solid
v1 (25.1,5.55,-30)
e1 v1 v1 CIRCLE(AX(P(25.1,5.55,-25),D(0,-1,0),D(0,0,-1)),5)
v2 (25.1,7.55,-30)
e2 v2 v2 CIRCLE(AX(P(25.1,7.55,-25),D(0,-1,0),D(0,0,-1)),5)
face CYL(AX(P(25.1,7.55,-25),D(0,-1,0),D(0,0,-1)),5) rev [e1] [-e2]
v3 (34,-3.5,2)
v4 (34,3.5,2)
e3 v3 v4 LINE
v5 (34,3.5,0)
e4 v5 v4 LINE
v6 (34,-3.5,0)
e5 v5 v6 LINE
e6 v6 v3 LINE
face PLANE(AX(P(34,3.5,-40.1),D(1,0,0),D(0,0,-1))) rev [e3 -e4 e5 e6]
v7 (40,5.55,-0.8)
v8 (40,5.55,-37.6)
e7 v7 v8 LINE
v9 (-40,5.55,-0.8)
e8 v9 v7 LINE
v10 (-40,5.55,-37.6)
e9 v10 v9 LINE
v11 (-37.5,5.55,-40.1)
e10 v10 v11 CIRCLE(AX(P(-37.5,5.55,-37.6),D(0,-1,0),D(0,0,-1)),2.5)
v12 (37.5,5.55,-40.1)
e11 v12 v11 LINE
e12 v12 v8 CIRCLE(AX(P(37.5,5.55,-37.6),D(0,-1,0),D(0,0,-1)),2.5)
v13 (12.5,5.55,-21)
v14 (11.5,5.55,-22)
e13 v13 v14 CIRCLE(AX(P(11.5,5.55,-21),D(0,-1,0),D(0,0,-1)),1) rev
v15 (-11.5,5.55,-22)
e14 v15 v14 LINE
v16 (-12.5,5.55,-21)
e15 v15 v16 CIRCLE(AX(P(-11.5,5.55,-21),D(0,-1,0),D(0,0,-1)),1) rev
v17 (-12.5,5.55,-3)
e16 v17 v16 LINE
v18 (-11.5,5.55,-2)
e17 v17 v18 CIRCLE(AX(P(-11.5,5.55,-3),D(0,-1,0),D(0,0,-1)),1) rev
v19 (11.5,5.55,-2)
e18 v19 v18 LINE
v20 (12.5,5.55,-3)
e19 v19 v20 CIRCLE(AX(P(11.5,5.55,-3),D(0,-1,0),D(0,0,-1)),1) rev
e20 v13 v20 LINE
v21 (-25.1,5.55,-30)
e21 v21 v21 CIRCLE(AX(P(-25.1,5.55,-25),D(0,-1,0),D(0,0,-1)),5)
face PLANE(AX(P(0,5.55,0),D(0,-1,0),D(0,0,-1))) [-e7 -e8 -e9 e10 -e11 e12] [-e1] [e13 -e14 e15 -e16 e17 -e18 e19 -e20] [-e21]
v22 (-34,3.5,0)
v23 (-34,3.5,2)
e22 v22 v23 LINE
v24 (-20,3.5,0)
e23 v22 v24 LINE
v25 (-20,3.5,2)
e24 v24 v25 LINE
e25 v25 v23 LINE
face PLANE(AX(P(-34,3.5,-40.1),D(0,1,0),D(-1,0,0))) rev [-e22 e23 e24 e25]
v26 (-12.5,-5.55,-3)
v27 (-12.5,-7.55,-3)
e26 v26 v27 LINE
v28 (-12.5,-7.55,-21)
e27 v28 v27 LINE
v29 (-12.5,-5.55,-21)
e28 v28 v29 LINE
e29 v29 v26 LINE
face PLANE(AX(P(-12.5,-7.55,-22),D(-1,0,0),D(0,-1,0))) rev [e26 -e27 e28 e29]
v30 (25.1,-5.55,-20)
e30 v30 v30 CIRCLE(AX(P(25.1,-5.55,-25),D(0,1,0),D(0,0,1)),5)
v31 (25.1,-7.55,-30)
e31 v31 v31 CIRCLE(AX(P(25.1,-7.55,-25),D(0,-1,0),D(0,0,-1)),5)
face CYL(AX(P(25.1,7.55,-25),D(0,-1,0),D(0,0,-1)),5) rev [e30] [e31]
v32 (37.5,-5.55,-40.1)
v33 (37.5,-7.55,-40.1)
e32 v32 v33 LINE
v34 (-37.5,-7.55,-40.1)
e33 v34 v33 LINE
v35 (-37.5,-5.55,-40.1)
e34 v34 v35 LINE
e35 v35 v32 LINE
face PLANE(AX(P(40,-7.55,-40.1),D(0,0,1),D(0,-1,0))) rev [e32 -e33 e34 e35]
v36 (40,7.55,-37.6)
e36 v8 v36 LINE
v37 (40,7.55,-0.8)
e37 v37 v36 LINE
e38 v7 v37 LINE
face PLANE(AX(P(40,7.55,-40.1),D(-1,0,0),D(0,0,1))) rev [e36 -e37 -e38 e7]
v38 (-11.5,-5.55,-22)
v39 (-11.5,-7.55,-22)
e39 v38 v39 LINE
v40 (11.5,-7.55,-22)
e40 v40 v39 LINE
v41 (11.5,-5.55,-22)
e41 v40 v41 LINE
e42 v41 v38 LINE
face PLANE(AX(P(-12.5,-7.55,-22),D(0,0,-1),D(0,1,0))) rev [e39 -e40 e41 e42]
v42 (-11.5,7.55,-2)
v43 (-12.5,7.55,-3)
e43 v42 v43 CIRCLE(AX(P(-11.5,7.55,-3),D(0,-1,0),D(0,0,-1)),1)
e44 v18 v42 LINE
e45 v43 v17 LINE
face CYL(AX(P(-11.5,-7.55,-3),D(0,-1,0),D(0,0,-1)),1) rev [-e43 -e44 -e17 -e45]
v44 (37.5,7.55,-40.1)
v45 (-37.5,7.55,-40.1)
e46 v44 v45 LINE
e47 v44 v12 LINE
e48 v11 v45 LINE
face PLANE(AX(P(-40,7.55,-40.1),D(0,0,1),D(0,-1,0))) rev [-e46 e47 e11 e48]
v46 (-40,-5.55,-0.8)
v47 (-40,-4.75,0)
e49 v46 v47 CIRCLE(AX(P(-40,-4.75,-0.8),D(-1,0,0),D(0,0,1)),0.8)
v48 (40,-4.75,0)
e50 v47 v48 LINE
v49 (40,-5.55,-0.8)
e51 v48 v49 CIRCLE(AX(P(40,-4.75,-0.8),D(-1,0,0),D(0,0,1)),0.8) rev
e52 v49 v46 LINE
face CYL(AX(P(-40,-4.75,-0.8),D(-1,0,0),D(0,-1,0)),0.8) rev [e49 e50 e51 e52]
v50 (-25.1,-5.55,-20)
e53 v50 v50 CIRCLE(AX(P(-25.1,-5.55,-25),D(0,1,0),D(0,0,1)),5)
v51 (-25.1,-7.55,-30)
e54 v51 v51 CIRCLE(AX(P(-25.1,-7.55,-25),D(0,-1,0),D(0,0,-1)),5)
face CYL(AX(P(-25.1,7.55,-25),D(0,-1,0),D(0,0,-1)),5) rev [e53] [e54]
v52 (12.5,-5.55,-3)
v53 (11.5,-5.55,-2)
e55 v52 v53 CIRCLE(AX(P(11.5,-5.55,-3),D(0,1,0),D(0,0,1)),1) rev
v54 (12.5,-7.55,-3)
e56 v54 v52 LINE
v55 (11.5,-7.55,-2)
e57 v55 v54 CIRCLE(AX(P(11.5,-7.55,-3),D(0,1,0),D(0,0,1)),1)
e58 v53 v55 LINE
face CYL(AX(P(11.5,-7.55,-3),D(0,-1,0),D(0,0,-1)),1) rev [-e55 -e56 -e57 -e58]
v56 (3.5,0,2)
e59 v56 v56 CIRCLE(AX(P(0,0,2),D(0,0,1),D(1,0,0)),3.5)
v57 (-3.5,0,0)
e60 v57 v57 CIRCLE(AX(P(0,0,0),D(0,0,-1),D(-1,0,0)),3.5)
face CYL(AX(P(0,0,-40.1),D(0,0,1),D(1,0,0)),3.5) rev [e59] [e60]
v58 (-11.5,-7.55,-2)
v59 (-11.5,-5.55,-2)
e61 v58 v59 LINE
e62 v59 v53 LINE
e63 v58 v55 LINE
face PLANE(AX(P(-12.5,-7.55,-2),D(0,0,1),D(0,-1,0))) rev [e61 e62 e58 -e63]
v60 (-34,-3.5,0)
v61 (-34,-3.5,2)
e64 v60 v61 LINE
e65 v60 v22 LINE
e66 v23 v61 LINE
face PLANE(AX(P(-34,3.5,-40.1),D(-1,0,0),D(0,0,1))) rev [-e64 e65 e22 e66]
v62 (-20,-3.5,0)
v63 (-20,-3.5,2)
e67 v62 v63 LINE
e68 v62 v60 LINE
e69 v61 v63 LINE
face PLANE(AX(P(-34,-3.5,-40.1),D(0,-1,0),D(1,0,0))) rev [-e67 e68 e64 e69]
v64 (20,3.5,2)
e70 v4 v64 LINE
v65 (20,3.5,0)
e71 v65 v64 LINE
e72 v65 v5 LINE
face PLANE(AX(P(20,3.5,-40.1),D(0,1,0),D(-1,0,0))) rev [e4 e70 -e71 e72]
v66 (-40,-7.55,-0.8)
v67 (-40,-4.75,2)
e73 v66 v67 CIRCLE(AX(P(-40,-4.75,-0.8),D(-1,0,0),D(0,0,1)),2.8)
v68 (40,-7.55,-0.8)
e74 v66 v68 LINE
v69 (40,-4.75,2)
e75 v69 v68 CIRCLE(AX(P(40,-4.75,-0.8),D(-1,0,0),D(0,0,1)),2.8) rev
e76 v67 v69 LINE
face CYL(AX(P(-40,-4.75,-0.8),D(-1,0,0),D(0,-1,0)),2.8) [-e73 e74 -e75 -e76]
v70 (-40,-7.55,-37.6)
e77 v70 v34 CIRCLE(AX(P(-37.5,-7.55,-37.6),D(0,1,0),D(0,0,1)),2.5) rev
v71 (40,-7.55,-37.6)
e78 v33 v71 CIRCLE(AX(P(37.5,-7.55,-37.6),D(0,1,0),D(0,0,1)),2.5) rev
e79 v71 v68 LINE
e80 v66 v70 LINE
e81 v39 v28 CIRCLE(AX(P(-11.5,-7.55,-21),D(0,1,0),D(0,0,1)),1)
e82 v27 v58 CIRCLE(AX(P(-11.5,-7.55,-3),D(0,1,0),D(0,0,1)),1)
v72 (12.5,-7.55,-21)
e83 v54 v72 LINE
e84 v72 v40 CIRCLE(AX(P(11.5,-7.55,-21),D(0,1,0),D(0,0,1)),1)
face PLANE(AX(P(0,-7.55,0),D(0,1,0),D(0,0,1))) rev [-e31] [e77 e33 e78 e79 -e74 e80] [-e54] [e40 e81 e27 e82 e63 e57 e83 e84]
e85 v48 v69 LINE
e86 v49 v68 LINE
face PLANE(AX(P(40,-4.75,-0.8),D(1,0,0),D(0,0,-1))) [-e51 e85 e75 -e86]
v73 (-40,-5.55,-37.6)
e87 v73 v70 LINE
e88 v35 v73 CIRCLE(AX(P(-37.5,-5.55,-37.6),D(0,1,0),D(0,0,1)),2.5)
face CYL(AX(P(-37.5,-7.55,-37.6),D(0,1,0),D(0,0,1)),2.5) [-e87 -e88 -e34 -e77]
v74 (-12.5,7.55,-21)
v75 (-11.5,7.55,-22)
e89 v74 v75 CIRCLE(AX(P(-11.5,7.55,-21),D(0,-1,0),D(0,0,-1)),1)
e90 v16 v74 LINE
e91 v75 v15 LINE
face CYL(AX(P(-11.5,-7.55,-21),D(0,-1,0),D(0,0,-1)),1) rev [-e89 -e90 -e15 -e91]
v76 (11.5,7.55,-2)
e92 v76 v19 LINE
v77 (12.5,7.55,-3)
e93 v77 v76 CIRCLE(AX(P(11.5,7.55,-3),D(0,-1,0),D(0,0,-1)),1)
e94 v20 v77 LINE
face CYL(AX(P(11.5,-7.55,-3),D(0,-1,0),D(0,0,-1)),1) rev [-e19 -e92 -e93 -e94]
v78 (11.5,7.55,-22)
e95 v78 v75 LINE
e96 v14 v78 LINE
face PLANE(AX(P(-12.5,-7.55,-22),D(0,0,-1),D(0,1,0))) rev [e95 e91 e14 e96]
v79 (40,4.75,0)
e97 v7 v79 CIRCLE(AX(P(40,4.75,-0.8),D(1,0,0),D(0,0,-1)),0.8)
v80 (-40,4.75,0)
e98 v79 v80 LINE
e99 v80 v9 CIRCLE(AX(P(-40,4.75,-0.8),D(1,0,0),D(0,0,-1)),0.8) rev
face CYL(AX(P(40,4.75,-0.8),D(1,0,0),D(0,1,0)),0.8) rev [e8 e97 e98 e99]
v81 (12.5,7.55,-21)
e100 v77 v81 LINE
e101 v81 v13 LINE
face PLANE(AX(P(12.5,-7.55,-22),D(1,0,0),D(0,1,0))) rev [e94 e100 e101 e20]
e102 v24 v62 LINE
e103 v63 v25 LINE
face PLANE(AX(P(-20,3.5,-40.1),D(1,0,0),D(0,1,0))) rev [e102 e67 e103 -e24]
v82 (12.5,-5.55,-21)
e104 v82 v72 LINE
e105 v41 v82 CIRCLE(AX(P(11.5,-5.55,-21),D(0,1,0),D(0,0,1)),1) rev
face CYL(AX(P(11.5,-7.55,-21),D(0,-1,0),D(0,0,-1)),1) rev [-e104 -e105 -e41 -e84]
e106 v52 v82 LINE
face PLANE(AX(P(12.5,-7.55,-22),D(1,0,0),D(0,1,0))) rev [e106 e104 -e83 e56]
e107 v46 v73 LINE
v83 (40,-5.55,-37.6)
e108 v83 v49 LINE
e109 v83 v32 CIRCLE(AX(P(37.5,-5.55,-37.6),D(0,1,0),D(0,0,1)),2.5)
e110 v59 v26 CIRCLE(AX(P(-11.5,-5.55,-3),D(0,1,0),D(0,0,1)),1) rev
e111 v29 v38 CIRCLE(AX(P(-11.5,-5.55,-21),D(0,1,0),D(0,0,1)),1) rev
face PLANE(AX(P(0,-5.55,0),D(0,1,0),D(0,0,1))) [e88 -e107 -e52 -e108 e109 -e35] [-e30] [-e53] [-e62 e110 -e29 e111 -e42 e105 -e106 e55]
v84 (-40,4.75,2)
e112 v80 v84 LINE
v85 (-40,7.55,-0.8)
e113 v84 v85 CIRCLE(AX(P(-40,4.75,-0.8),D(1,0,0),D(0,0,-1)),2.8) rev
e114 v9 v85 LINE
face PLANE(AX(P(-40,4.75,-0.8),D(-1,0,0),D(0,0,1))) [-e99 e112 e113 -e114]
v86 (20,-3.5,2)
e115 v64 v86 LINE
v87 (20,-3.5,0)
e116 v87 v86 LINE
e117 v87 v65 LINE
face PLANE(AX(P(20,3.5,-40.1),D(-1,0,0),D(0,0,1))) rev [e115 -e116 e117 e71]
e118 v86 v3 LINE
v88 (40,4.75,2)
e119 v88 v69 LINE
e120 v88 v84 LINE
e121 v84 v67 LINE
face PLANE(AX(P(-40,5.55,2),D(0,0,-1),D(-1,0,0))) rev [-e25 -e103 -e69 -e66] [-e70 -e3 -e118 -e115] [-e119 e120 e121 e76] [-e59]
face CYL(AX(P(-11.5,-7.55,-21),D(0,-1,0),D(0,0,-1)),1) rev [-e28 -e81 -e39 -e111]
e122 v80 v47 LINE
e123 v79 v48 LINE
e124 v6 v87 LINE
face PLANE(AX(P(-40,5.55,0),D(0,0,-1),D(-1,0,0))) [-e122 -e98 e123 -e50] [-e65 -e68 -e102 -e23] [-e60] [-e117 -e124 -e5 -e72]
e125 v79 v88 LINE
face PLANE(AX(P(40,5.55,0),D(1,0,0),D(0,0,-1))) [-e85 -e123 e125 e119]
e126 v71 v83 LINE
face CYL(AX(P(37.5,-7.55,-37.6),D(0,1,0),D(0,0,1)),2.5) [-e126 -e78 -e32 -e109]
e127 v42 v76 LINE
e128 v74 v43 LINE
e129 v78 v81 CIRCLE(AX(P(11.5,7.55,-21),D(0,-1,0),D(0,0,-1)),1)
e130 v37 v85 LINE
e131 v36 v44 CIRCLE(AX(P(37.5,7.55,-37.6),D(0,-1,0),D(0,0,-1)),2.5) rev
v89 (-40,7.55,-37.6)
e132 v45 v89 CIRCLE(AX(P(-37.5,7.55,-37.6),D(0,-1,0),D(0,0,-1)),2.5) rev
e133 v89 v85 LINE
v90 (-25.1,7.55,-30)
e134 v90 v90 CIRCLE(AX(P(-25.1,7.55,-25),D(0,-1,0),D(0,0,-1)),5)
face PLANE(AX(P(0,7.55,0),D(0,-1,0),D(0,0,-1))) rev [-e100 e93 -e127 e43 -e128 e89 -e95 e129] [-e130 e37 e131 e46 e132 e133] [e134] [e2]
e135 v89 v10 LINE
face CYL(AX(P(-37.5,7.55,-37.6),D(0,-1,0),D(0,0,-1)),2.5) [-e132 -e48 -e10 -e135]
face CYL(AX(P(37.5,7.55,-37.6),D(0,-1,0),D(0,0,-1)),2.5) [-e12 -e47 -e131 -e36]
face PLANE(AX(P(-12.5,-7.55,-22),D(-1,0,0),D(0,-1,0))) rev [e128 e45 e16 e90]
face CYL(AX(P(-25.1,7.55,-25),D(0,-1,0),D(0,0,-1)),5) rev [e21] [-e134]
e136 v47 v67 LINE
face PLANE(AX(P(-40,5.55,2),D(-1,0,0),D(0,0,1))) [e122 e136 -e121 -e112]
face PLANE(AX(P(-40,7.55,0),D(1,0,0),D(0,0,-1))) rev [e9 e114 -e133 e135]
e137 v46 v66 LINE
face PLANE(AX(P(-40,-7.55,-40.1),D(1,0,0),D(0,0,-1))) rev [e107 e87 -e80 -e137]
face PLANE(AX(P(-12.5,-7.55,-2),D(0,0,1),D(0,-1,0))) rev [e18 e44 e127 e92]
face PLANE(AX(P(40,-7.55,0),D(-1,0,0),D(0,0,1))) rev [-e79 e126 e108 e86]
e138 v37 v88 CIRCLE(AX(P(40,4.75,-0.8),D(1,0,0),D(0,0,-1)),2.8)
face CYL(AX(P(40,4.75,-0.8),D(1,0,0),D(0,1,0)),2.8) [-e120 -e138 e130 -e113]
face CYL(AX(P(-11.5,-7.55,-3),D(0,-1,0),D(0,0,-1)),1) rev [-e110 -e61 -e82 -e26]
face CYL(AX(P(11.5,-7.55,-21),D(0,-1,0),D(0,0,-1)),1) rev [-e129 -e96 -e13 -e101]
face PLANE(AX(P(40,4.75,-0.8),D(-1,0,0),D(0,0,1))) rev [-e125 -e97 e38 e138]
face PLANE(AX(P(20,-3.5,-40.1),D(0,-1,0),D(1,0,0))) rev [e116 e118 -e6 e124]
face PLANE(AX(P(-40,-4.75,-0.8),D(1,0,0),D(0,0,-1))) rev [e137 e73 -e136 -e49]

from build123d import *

# Parameters (mm, degrees)
SKETCH1_W                      = 80
SKETCH1_H                      = 2
BASE_FLANGE1_DEPTH             = 5.55
EDGE_FLANGE1_STRIP_W           = 9.6
EDGE_FLANGE1_STRIP_H           = 2
EDGE_FLANGE1_STRIP_CUT_DEPTH   = 80
EDGE_FLANGE1_STRIP_2_W         = 9.6
EDGE_FLANGE1_STRIP_2_H         = 2
EDGE_FLANGE1_STRIP_CUT_2_DEPTH = 80
EDGE_FLANGE1_DEPTH             = 80
EDGE_FLANGE1_BEND_DEPTH        = 80
SKETCH12_R                     = 3.5
SKETCH12_W                     = 14
SKETCH12_H                     = 7
CUT_EXTRUDE1_DEPTH             = 59.561185951
SKETCH13_W                     = 25
SKETCH13_H                     = 20
CUT_EXTRUDE2_DEPTH             = 59.617574157
FILLET1_R                      = 1
FILLET2_R                      = 2.5
SKETCH15_R                     = 5
CUT_EXTRUDE3_DEPTH             = 59.617574157


# Sheet-metal steps are written as plain solids
with BuildPart() as part:
    # Sketch1 → Base-Flange1 (new, symmetric)
    with BuildSketch(Plane(origin=(0, 0, 0), x_dir=(1, 0, 0), z_dir=(0, 1, 0))):
        with Locations((0, -1)):
            Rectangle(SKETCH1_W, SKETCH1_H)
    extrude(amount=BASE_FLANGE1_DEPTH, both=True)

    # Edge-Flange1 strip (across the edge) → Edge-Flange1 strip cut (cut)
    with BuildSketch(Plane(origin=(40, -5.55, 0), x_dir=(0, 1, 0), z_dir=(-1, 0, 0))):
        with Locations((-4, -1)):
            Rectangle(EDGE_FLANGE1_STRIP_W, EDGE_FLANGE1_STRIP_H)
    extrude(amount=EDGE_FLANGE1_STRIP_CUT_DEPTH, mode=Mode.SUBTRACT)

    # Edge-Flange1 strip 2 (across the edge) → Edge-Flange1 strip cut 2 (cut)
    with BuildSketch(Plane(origin=(-40, 5.55, 0), x_dir=(0, -1, 0), z_dir=(1, 0, 0))):
        with Locations((-4, -1)):
            Rectangle(EDGE_FLANGE1_STRIP_2_W, EDGE_FLANGE1_STRIP_2_H)
    extrude(amount=EDGE_FLANGE1_STRIP_CUT_2_DEPTH, mode=Mode.SUBTRACT)

    # Edge-Flange1 section (across the edge) → Edge-Flange1 (add)
    with BuildSketch(Plane(origin=(40, -5.55, 0), x_dir=(0, 1, 0), z_dir=(-1, 0, 0))):
        with BuildLine():
            Line((-2, 0.8), (-2, 40.1))
            Line((-2, 40.1), (0, 40.1))
            Line((0, 40.1), (0, 0.8))
            ThreePointArc((0, 0.8), (0.234314575, 0.234314575), (0.8, 0))
            Line((0.8, 0), (0.8, -2))
            ThreePointArc((0.8, -2), (-1.179898987, -1.179898987), (-2, 0.8))
        make_face()
    extrude(amount=EDGE_FLANGE1_DEPTH)

    # Edge-Flange1 section 2 (across the edge) → Edge-Flange1 bend (add)
    with BuildSketch(Plane(origin=(-40, 5.55, 0), x_dir=(0, -1, 0), z_dir=(1, 0, 0))):
        with BuildLine():
            Line((-2, 0.8), (-2, 40.1))
            Line((-2, 40.1), (0, 40.1))
            Line((0, 40.1), (0, 0.8))
            ThreePointArc((0, 0.8), (0.234314575, 0.234314575), (0.8, 0))
            Line((0.8, 0), (0.8, -2))
            ThreePointArc((0.8, -2), (-1.179898987, -1.179898987), (-2, 0.8))
        make_face()
    extrude(amount=EDGE_FLANGE1_BEND_DEPTH)

    # Sketch12 → Cut-Extrude1 (cut, through all)
    with BuildSketch(Plane.XY.offset(2)):
        Circle(SKETCH12_R)
        with Locations((-27, 0)):
            Rectangle(SKETCH12_W, SKETCH12_H)
        with Locations((27, 0)):
            Rectangle(SKETCH12_W, SKETCH12_H)
    extrude(amount=-CUT_EXTRUDE1_DEPTH, mode=Mode.SUBTRACT)

    # Sketch13 → Cut-Extrude2 (cut, through all)
    with BuildSketch(Plane(origin=(0, 7.55, 0), x_dir=(1, 0, 0), z_dir=(0, 1, 0))):
        with Locations((0, 12)):
            Rectangle(SKETCH13_W, SKETCH13_H)
    extrude(amount=-CUT_EXTRUDE2_DEPTH, mode=Mode.SUBTRACT)

    # Fillet1
    fillet1_edges = [part.edges().sort_by_distance(p)[0] for p in [
        (-12.5, -6.55, -2),
        (-12.5, -6.55, -22),
        (12.5, -6.55, -22),
        (12.5, -6.55, -2),
        (-12.5, 6.55, -2),
        (-12.5, 6.55, -22),
        (12.5, 6.55, -22),
        (12.5, 6.55, -2),
    ]]
    fillet(fillet1_edges, radius=FILLET1_R)

    # Fillet2
    fillet2_edges = [part.edges().sort_by_distance(p)[0] for p in [
        (40, -6.55, -40.1),
        (-40, -6.55, -40.1),
        (-40, 6.55, -40.1),
        (40, 6.55, -40.1),
    ]]
    fillet(fillet2_edges, radius=FILLET2_R)

    # Sketch15 → Cut-Extrude3 (cut, through all)
    with BuildSketch(Plane.XZ.offset(7.55)):
        with Locations(Location((25.1, -25, 0), (0, 0, 270))):
            Circle(SKETCH15_R)
        with Locations(Location((-25.1, -25, 0), (0, 0, 270))):
            Circle(SKETCH15_R)
    extrude(amount=-CUT_EXTRUDE3_DEPTH, mode=Mode.SUBTRACT)


solid = part.part
